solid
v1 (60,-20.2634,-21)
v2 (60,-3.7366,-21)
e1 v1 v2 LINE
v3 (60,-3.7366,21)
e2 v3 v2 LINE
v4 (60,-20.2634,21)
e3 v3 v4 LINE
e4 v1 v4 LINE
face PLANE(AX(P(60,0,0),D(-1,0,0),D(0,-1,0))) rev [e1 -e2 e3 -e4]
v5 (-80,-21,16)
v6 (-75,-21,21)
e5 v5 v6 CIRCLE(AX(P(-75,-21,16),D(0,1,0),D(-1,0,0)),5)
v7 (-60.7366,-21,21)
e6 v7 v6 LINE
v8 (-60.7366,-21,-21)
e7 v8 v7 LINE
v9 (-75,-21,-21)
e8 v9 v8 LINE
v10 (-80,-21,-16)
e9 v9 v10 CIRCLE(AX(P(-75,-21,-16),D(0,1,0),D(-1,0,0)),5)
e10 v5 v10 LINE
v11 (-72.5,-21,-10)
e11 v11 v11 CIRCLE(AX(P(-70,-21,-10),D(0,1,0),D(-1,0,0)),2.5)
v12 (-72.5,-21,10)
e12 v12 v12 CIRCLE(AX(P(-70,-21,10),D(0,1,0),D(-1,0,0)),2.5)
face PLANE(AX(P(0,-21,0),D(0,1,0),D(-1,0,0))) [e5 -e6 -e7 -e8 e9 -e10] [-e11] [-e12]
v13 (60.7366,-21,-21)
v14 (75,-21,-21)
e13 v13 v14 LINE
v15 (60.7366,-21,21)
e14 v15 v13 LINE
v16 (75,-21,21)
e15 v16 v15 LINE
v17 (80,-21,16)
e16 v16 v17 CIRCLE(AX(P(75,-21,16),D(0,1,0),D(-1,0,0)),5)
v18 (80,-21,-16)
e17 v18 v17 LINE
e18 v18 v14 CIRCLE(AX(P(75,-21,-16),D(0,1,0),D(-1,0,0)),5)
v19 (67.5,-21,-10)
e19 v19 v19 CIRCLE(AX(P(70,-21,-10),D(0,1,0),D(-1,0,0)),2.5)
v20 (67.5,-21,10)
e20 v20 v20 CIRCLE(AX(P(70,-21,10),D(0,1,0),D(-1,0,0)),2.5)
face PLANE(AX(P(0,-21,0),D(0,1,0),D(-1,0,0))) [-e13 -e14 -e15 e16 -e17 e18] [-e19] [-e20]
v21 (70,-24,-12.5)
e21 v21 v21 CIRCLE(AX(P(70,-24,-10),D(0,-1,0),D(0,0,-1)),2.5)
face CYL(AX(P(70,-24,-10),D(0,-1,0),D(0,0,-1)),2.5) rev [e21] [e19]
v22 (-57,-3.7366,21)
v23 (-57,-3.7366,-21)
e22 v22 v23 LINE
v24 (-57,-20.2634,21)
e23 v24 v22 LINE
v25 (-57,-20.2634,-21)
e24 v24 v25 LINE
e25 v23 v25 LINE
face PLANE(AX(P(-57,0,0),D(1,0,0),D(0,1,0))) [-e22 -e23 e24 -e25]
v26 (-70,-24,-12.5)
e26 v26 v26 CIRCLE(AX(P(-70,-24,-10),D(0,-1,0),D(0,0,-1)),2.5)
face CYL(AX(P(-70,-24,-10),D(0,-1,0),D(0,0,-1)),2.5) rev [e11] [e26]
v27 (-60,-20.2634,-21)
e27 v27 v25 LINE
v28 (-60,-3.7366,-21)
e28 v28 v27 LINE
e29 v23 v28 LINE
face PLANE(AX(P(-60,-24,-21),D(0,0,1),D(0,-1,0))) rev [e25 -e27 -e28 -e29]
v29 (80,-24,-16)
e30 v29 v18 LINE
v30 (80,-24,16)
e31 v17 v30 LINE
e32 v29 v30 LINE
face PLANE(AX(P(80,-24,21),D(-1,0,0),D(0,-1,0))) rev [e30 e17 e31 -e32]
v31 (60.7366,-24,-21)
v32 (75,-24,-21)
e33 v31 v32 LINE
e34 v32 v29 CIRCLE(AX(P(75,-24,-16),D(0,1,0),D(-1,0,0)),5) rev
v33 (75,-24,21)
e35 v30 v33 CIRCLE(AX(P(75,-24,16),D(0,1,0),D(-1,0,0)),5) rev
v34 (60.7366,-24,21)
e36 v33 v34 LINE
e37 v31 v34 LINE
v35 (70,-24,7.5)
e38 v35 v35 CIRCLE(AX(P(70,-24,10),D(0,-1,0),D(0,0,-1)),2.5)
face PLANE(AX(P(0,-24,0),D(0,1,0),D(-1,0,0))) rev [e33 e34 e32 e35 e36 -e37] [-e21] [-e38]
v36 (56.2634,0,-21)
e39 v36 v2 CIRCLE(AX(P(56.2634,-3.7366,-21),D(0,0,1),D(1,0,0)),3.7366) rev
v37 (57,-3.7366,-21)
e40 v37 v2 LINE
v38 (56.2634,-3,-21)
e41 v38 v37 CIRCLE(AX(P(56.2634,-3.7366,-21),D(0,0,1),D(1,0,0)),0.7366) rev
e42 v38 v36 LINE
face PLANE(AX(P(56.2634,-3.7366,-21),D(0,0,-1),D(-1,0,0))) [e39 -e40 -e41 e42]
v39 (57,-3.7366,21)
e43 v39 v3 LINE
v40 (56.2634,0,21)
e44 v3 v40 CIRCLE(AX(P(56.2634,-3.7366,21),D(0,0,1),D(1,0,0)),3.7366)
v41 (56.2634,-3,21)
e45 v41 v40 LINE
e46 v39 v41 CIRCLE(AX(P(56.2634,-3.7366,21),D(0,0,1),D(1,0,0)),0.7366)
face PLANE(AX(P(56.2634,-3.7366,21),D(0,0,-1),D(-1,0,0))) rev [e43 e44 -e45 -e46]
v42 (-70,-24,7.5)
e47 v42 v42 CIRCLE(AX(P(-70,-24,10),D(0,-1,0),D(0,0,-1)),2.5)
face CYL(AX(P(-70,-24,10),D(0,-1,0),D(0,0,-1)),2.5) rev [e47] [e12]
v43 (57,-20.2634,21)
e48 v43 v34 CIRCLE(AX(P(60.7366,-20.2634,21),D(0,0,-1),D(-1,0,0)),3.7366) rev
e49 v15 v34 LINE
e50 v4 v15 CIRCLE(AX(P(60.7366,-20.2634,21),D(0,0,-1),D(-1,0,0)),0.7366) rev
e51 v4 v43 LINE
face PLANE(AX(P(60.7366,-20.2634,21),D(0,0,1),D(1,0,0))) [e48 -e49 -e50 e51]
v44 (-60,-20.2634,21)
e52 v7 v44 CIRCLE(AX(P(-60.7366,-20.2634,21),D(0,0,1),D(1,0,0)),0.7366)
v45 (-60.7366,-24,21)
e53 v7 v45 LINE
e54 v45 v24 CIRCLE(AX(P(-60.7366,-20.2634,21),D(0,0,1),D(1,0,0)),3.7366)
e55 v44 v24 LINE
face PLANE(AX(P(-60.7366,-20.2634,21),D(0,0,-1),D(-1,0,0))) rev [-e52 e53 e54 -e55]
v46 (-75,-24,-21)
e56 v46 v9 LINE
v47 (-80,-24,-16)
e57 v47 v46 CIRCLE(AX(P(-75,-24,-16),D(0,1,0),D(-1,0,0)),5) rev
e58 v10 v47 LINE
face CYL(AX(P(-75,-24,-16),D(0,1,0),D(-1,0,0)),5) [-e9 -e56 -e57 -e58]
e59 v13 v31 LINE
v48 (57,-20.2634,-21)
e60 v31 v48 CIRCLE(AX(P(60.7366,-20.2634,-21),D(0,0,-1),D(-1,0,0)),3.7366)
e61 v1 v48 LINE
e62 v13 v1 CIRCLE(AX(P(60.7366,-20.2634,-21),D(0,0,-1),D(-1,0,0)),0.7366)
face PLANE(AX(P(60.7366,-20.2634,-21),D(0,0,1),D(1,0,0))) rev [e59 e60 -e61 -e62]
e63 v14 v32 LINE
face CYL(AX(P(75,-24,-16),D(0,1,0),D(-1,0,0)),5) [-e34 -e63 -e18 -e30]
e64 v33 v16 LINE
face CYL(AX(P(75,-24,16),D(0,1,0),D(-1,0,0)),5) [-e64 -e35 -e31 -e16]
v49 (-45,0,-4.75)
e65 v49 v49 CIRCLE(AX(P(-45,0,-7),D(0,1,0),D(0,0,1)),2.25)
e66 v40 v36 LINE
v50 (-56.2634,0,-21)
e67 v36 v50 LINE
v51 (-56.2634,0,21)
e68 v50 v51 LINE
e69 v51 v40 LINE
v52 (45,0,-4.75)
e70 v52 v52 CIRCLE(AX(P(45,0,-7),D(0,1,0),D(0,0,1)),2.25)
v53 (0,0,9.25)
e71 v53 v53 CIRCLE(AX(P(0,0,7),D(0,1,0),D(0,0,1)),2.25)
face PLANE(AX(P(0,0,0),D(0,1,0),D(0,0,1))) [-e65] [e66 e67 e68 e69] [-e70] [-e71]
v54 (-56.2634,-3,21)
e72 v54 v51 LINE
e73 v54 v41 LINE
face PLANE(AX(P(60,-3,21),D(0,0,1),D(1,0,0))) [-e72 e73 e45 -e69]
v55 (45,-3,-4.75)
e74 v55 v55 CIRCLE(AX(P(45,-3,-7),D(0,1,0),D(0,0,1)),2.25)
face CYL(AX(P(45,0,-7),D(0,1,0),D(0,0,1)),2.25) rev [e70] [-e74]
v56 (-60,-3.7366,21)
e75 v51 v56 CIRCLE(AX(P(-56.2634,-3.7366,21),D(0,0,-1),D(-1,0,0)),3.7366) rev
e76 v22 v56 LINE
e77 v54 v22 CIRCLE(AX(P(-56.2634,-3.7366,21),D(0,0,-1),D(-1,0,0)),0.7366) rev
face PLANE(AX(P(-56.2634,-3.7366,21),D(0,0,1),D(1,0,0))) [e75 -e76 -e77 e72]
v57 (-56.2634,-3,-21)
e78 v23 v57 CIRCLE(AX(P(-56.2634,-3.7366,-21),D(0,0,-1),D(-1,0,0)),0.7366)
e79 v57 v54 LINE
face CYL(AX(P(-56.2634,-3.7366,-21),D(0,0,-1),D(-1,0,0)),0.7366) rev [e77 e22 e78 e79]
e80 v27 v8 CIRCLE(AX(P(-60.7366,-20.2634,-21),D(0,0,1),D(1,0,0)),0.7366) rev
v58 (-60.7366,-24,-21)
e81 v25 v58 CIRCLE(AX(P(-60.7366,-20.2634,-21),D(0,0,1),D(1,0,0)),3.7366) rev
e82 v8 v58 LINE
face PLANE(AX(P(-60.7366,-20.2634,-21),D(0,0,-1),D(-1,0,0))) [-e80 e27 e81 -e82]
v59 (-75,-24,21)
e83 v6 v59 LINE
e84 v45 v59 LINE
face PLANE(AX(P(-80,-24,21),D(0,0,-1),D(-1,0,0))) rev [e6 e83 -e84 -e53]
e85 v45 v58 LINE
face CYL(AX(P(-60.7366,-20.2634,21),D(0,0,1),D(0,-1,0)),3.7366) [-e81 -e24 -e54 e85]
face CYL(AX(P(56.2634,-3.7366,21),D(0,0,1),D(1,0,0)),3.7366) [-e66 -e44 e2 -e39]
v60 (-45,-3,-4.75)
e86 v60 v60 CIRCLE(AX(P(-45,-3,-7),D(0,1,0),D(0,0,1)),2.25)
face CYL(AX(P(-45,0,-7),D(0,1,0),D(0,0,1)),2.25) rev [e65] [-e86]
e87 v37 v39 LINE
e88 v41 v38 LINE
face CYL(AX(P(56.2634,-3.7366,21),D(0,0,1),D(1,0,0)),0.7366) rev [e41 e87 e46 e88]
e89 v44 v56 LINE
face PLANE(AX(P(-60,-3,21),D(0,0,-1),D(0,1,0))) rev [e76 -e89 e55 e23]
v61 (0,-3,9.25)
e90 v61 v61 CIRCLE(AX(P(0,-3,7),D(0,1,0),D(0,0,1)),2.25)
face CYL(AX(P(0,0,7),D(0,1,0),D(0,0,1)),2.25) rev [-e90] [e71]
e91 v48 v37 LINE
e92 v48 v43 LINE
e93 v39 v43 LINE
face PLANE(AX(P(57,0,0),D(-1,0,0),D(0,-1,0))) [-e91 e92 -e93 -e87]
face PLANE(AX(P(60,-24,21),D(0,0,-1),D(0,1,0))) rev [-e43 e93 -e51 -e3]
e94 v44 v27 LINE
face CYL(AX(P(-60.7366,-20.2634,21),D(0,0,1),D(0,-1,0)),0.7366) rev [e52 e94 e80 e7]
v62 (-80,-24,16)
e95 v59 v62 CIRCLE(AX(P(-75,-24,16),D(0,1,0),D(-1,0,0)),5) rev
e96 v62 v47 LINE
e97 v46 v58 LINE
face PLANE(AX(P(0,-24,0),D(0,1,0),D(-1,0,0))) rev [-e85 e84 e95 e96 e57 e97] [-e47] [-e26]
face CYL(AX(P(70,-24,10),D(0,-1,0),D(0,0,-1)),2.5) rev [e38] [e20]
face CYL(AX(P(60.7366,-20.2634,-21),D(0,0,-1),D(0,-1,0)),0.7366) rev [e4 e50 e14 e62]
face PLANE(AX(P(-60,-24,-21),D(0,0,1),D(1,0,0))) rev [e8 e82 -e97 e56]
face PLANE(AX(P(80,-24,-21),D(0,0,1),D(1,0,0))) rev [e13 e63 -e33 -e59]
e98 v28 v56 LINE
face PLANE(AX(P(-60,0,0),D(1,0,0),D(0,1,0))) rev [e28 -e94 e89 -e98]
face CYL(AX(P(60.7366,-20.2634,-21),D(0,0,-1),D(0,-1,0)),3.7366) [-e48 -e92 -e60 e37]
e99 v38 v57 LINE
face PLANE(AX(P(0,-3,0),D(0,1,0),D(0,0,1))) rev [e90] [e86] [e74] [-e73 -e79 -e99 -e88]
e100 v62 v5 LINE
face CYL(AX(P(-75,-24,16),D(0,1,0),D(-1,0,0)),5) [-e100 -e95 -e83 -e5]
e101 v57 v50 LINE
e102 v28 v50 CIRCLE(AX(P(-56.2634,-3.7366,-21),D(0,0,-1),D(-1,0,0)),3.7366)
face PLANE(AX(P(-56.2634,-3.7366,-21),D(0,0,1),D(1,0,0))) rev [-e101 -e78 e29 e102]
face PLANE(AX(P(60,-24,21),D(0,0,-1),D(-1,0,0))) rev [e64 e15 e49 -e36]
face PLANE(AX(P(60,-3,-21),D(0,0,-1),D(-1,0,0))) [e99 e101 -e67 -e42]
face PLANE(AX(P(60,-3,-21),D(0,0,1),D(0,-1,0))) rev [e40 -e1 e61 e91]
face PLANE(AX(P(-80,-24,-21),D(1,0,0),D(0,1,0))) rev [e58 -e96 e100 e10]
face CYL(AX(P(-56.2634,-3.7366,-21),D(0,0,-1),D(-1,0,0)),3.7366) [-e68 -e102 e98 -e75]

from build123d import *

# Parameters (mm, degrees)
SKETCH_1_W                         = 120
SKETCH_1_H                         = 42
SM_BASE_FLANGE_1_DEPTH             = 3
SM_EDGE_FLANGE_1_STRIP_W           = 13.4732
SM_EDGE_FLANGE_1_STRIP_H           = 3
SM_EDGE_FLANGE_1_STRIP_CUT_DEPTH   = 42
SM_EDGE_FLANGE_1_STRIP_2_W         = 13.4732
SM_EDGE_FLANGE_1_STRIP_2_H         = 3
SM_EDGE_FLANGE_1_STRIP_CUT_2_DEPTH = 42
SM_EDGE_FLANGE_1_DEPTH             = 42
SM_EDGE_FLANGE_1_BEND_DEPTH        = 42
SM_EDGE_FLANGE_2_STRIP_W           = 13.4732
SM_EDGE_FLANGE_2_STRIP_H           = 3
SM_EDGE_FLANGE_2_STRIP_CUT_DEPTH   = 42
SM_EDGE_FLANGE_2_STRIP_2_W         = 13.4732
SM_EDGE_FLANGE_2_STRIP_2_H         = 3
SM_EDGE_FLANGE_2_STRIP_CUT_2_DEPTH = 42
SM_EDGE_FLANGE_2_DEPTH             = 42
SM_EDGE_FLANGE_2_BEND_DEPTH        = 42
FILLET_1_R                         = 5
HOLE_WIZARD_M6_1_D                 = 5
HOLE_WIZARD_M4_1_D                 = 4.5


# Sheet-metal steps are written as plain solids
with BuildPart() as part:
    # Sketch 1 → 베이스-플랜지1 (new body)
    with BuildSketch(Plane(origin=(0, 0, 0), x_dir=(1, 0, 0), z_dir=(0, 1, 0))):
        Rectangle(SKETCH_1_W, SKETCH_1_H)
    extrude(amount=-SM_BASE_FLANGE_1_DEPTH)

    # 모서리 플랜지1 strip (across the edge) → 모서리 플랜지1 strip cut (cut)
    with BuildSketch(Plane(origin=(-60, -3, 21), x_dir=(1, 0, 0), z_dir=(0, 0, -1))):
        with Locations((-3, -1.5)):
            Rectangle(SM_EDGE_FLANGE_1_STRIP_W, SM_EDGE_FLANGE_1_STRIP_H)
    extrude(amount=SM_EDGE_FLANGE_1_STRIP_CUT_DEPTH, mode=Mode.SUBTRACT)

    # 모서리 플랜지1 strip 2 (across the edge) → 모서리 플랜지1 strip cut 2 (cut)
    with BuildSketch(Plane(origin=(60, -3, -21), x_dir=(-1, 0, 0), z_dir=(0, 0, 1))):
        with Locations((-3, -1.5)):
            Rectangle(SM_EDGE_FLANGE_1_STRIP_2_W, SM_EDGE_FLANGE_1_STRIP_2_H)
    extrude(amount=SM_EDGE_FLANGE_1_STRIP_CUT_2_DEPTH, mode=Mode.SUBTRACT)

    # 모서리 플랜지1 section (across the edge) → 모서리 플랜지1 (add)
    with BuildSketch(Plane(origin=(-60, -3, 21), x_dir=(1, 0, 0), z_dir=(0, 0, -1))):
        with BuildLine():
            Line((0, 0.7366), (0, 21))
            Line((0, 21), (3, 21))
            Line((3, 21), (3, 0.7366))
            ThreePointArc((3, 0.7366), (3.215745145, 0.215745145), (3.7366, 0))
            Line((3.7366, 0), (3.7366, -3))
            ThreePointArc((3.7366, -3), (1.094424801, -1.905575199), (0, 0.7366))
        make_face()
    extrude(amount=SM_EDGE_FLANGE_1_DEPTH)

    # 모서리 플랜지1 section 2 (across the edge) → 모서리 플랜지1 bend (add)
    with BuildSketch(Plane(origin=(60, -3, -21), x_dir=(-1, 0, 0), z_dir=(0, 0, 1))):
        with BuildLine():
            Line((0, 0.7366), (0, 21))
            Line((0, 21), (3, 21))
            Line((3, 21), (3, 0.7366))
            ThreePointArc((3, 0.7366), (3.215745145, 0.215745145), (3.7366, 0))
            Line((3.7366, 0), (3.7366, -3))
            ThreePointArc((3.7366, -3), (1.094424801, -1.905575199), (0, 0.7366))
        make_face()
    extrude(amount=SM_EDGE_FLANGE_1_BEND_DEPTH)

    # 모서리 플랜지2 strip (across the edge) → 모서리 플랜지2 strip cut (cut)
    with BuildSketch(Plane(origin=(-60, -24, -21), x_dir=(0, 1, 0), z_dir=(0, 0, 1))):
        with Locations((-3, -1.5)):
            Rectangle(SM_EDGE_FLANGE_2_STRIP_W, SM_EDGE_FLANGE_2_STRIP_H)
    extrude(amount=SM_EDGE_FLANGE_2_STRIP_CUT_DEPTH, mode=Mode.SUBTRACT)

    # 모서리 플랜지2 strip 2 (across the edge) → 모서리 플랜지2 strip cut 2 (cut)
    with BuildSketch(Plane(origin=(60, -24, 21), x_dir=(0, 1, 0), z_dir=(0, 0, -1))):
        with Locations((-3, -1.5)):
            Rectangle(SM_EDGE_FLANGE_2_STRIP_2_W, SM_EDGE_FLANGE_2_STRIP_2_H)
    extrude(amount=SM_EDGE_FLANGE_2_STRIP_CUT_2_DEPTH, mode=Mode.SUBTRACT)

    # 모서리 플랜지2 section (across the edge) → 모서리 플랜지2 (add)
    with BuildSketch(Plane(origin=(-60, -24, -21), x_dir=(0, 1, 0), z_dir=(0, 0, 1))):
        with BuildLine():
            Line((0, 0.7366), (0, 20))
            Line((0, 20), (3, 20))
            Line((3, 20), (3, 0.7366))
            ThreePointArc((3, 0.7366), (3.215745145, 0.215745145), (3.7366, 0))
            Line((3.7366, 0), (3.7366, -3))
            ThreePointArc((3.7366, -3), (1.094424801, -1.905575199), (0, 0.7366))
        make_face()
    extrude(amount=SM_EDGE_FLANGE_2_DEPTH)

    # 모서리 플랜지2 section 2 (across the edge) → 모서리 플랜지2 bend (add)
    with BuildSketch(Plane(origin=(60, -24, 21), x_dir=(0, 1, 0), z_dir=(0, 0, -1))):
        with BuildLine():
            Line((0, 0.7366), (0, 20))
            Line((0, 20), (3, 20))
            Line((3, 20), (3, 0.7366))
            ThreePointArc((3, 0.7366), (3.215745145, 0.215745145), (3.7366, 0))
            Line((3.7366, 0), (3.7366, -3))
            ThreePointArc((3.7366, -3), (1.094424801, -1.905575199), (0, 0.7366))
        make_face()
    extrude(amount=SM_EDGE_FLANGE_2_BEND_DEPTH)

    # 필렛1
    fillet_1_edges = [part.edges().sort_by_distance(p)[0] for p in [
        (-80, -22.5, -21),
        (-80, -22.5, 21),
        (80, -22.5, 21),
        (80, -22.5, -21),
    ]]
    fillet(fillet_1_edges, radius=FILLET_1_R)

    # M6 탭을 위한 탭 드릴1 (through all)
    with Locations(Plane(origin=(0, -24, 0), x_dir=(-1, 0, 0), z_dir=(0, -1, 0))):
        with Locations((-70, 10), (-70, -10), (70, 10), (70, -10)):
            Hole(HOLE_WIZARD_M6_1_D / 2)

    # M4 여유 구멍1 (through all)
    with Locations(Plane(origin=(0, 0, 0), x_dir=(1, 0, 0), z_dir=(0, 1, 0))):
        with Locations((-45, 7), (0, -7), (45, 7)):
            Hole(HOLE_WIZARD_M4_1_D / 2)


solid = part.part
